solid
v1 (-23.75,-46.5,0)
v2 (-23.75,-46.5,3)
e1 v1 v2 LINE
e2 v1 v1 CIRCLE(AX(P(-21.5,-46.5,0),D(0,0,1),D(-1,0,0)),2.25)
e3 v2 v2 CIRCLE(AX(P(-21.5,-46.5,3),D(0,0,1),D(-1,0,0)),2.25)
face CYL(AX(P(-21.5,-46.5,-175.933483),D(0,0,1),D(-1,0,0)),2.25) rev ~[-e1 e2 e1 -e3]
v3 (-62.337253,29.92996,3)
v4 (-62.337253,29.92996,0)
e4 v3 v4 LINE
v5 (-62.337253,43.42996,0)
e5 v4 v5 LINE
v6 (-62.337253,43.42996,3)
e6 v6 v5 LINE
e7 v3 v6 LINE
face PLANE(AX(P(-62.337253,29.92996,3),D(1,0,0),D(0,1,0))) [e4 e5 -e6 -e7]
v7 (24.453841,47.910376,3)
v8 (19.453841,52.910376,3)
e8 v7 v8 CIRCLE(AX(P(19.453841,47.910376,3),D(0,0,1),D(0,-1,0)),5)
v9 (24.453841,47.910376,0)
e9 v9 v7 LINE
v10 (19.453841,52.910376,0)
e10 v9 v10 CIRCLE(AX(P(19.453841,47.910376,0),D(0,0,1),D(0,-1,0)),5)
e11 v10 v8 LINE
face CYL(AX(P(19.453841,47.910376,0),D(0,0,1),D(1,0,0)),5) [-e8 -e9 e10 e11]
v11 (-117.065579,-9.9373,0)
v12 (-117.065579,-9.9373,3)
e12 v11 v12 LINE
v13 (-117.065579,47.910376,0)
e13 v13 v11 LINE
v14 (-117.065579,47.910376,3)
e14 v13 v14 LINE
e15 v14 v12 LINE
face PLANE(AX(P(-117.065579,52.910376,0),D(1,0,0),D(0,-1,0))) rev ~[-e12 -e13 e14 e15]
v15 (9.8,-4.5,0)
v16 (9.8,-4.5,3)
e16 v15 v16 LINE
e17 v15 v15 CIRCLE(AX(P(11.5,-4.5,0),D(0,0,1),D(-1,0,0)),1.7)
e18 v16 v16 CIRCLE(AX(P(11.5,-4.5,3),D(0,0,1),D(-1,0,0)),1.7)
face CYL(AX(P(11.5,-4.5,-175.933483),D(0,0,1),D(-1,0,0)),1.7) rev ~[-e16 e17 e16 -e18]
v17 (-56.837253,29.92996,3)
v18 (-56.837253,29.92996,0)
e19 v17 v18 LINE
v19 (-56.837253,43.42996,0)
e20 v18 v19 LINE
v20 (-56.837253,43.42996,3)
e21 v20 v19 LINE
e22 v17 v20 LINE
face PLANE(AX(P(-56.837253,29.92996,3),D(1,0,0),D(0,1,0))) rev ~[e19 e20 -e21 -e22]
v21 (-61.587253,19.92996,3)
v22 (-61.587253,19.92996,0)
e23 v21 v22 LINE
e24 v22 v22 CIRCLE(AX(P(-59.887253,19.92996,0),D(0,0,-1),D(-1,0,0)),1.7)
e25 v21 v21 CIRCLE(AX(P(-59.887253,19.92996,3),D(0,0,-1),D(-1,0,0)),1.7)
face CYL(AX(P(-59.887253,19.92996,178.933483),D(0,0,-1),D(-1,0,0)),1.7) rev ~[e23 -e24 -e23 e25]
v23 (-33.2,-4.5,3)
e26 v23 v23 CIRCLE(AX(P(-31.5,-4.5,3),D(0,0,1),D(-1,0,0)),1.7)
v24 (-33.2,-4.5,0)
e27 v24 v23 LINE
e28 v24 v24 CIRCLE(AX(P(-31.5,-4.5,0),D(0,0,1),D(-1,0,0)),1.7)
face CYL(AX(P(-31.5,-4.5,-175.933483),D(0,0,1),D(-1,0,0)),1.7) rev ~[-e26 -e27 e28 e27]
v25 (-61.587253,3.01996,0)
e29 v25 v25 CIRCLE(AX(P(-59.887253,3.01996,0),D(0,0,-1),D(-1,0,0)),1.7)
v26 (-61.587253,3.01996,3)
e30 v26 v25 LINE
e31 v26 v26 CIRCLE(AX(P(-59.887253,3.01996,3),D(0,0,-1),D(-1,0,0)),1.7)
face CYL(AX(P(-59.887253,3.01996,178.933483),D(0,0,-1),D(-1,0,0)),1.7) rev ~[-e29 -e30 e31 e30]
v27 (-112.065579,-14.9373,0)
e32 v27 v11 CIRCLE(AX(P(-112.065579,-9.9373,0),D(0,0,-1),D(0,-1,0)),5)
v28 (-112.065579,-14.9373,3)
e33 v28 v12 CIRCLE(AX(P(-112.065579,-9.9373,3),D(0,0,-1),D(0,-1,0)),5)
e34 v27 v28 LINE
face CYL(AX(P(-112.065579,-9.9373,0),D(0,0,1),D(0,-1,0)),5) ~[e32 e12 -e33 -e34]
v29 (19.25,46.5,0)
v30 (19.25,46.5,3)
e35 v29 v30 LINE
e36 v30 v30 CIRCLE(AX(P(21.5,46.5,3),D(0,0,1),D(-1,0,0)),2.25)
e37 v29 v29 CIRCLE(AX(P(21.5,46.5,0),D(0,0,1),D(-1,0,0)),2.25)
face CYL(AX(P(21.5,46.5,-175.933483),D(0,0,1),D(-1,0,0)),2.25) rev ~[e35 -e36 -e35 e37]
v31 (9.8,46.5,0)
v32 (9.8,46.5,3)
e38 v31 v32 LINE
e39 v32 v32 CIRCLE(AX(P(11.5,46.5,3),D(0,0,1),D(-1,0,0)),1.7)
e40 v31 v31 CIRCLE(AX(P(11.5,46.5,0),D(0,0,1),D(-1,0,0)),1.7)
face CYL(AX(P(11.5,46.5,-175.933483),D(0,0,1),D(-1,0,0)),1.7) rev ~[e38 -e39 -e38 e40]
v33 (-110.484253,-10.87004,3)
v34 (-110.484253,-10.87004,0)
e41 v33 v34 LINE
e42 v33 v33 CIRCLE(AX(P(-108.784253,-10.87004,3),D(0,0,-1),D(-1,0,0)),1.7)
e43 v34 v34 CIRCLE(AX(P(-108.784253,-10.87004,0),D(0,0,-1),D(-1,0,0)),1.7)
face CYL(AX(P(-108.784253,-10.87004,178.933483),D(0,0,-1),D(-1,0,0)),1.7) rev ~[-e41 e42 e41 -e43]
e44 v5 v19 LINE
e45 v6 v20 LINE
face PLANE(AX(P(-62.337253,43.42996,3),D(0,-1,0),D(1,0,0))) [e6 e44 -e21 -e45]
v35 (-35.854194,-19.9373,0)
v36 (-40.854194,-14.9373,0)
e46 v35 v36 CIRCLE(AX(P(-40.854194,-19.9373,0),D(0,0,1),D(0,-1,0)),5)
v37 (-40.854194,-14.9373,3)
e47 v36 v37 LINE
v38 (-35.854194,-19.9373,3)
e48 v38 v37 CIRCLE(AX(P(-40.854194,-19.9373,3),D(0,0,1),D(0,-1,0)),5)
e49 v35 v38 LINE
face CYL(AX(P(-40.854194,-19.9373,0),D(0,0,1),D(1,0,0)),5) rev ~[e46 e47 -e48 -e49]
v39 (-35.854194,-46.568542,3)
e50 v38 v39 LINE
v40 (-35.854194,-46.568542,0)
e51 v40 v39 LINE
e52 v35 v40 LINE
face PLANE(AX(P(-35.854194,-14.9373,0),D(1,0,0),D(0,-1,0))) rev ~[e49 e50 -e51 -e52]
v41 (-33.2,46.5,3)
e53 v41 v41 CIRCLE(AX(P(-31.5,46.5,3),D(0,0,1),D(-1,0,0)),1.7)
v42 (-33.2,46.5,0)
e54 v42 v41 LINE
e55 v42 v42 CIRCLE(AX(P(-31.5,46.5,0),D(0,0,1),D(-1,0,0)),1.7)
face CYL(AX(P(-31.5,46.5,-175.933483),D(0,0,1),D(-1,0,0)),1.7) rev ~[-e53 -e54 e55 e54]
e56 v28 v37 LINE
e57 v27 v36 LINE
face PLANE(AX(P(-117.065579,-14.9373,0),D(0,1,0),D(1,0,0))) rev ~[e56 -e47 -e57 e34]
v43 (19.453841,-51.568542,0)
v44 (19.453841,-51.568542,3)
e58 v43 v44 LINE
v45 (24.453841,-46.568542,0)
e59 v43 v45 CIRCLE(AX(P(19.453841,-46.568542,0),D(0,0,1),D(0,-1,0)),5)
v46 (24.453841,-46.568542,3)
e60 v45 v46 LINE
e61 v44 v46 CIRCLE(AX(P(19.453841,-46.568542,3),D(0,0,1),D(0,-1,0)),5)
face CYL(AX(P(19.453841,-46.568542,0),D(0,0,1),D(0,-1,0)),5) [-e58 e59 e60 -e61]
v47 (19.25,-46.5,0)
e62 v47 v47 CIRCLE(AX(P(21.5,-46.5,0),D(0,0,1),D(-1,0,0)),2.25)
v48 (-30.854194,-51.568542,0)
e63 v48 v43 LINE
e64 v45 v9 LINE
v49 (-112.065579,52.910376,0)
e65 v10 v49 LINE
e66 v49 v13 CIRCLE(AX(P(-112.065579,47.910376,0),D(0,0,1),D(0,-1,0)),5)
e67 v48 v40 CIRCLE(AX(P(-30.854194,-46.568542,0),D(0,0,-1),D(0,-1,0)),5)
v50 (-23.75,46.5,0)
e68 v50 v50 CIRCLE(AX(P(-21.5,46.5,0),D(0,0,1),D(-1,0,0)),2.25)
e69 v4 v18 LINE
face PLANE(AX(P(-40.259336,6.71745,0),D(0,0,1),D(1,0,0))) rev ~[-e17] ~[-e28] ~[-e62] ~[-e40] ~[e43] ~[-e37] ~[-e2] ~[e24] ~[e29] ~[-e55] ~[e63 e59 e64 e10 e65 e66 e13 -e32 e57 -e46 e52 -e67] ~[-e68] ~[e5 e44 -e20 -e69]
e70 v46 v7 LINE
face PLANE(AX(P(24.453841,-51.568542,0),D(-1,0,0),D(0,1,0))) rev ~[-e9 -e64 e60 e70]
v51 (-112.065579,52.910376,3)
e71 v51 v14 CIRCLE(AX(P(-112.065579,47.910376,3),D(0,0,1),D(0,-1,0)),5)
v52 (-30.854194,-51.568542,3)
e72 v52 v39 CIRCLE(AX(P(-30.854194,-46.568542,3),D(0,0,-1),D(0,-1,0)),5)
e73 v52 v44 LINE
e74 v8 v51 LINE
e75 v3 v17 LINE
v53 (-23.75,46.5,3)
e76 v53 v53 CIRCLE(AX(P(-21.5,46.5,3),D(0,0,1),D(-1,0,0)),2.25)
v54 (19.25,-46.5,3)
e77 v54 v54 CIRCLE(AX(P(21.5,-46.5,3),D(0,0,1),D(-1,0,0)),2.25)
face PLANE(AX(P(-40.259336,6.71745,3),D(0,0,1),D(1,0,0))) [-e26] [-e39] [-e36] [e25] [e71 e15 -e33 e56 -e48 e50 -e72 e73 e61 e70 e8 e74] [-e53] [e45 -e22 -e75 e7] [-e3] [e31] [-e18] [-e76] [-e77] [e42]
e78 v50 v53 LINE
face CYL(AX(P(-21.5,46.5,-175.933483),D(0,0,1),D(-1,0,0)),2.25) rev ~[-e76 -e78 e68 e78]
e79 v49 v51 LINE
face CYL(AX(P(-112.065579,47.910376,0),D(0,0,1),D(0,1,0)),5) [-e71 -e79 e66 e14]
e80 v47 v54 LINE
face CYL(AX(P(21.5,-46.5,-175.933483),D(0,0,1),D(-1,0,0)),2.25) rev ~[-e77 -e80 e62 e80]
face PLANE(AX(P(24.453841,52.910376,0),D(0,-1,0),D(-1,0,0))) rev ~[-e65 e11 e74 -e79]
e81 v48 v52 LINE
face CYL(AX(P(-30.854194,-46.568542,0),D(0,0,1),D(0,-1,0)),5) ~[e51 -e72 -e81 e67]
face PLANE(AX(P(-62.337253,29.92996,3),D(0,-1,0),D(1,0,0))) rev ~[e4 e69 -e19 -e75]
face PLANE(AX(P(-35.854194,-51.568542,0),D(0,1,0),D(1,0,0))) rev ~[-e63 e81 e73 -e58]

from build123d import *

# Parameters (mm, degrees)
F1_DEPTH = 3
F2_D     = 4.5
F3_R     = 5
F4_D     = 3.4
F6_D     = 3.4
F5_W     = 5.5
F5_H     = 13.5
F7_DEPTH = 25


# Not quite as in the source:
# - a feature names something its author has since deleted; it is built from what else it names


with BuildPart() as f1:
    # F0 (on Top) → F1 (new body)
    with BuildSketch(Plane.XY):
        Polygon((-35.8541943133, -51.5685416758), (24.4538411498, -51.5685416758), (24.4538411498, 52.9103763402), (-117.0655786991, 52.9103763402), (-117.0655786991, -14.937300235), (-35.8541943133, -14.937300235), align=None)
    extrude(amount=F1_DEPTH)

    # F2 (through all)
    with Locations(Plane(origin=(0, 0, 0), x_dir=(1, 0, 0), z_dir=(0, 0, -1))):
        with Locations((-21.5, -46.5), (21.5, -46.5), (21.5, 46.5), (-21.5, 46.5)):
            Hole(F2_D / 2)

    # F3
    f3_edges = [f1.edges().sort_by_distance(p)[0] for p in [
        (-117.065579, 52.910376, 1.5),
        (24.453841, 52.910376, 1.5),
        (24.453841, -51.568542, 1.5),
        (-35.854194, -14.9373, 1.5),
        (-35.854194, -51.568542, 1.5),
        (-117.065579, -14.9373, 1.5),
    ]]
    fillet(f3_edges, radius=F3_R)

    # F4 (through all)
    with Locations(Plane(origin=(0, 0, 0), x_dir=(1, 0, 0), z_dir=(0, 0, -1))):
        with Locations((-31.5, -46.5), (11.5, -46.5), (11.5, 4.5), (-31.5, 4.5)):
            Hole(F4_D / 2)

    # F6 (through all)
    with Locations(Plane.XY.offset(3)):
        with Locations((-59.8872532725, 3.0199595654), (-59.8872532725, 19.9299595654), (-108.7842532725, -10.8700404346)):
            Hole(F6_D / 2)

    # F5 (on face) → F7 (cut)
    with BuildSketch(Plane.XY.offset(3)):
        with Locations((-59.5872532725, 36.6799595654)):
            Rectangle(F5_W, F5_H)
    extrude(amount=-F7_DEPTH, mode=Mode.SUBTRACT)


solid = f1.part
